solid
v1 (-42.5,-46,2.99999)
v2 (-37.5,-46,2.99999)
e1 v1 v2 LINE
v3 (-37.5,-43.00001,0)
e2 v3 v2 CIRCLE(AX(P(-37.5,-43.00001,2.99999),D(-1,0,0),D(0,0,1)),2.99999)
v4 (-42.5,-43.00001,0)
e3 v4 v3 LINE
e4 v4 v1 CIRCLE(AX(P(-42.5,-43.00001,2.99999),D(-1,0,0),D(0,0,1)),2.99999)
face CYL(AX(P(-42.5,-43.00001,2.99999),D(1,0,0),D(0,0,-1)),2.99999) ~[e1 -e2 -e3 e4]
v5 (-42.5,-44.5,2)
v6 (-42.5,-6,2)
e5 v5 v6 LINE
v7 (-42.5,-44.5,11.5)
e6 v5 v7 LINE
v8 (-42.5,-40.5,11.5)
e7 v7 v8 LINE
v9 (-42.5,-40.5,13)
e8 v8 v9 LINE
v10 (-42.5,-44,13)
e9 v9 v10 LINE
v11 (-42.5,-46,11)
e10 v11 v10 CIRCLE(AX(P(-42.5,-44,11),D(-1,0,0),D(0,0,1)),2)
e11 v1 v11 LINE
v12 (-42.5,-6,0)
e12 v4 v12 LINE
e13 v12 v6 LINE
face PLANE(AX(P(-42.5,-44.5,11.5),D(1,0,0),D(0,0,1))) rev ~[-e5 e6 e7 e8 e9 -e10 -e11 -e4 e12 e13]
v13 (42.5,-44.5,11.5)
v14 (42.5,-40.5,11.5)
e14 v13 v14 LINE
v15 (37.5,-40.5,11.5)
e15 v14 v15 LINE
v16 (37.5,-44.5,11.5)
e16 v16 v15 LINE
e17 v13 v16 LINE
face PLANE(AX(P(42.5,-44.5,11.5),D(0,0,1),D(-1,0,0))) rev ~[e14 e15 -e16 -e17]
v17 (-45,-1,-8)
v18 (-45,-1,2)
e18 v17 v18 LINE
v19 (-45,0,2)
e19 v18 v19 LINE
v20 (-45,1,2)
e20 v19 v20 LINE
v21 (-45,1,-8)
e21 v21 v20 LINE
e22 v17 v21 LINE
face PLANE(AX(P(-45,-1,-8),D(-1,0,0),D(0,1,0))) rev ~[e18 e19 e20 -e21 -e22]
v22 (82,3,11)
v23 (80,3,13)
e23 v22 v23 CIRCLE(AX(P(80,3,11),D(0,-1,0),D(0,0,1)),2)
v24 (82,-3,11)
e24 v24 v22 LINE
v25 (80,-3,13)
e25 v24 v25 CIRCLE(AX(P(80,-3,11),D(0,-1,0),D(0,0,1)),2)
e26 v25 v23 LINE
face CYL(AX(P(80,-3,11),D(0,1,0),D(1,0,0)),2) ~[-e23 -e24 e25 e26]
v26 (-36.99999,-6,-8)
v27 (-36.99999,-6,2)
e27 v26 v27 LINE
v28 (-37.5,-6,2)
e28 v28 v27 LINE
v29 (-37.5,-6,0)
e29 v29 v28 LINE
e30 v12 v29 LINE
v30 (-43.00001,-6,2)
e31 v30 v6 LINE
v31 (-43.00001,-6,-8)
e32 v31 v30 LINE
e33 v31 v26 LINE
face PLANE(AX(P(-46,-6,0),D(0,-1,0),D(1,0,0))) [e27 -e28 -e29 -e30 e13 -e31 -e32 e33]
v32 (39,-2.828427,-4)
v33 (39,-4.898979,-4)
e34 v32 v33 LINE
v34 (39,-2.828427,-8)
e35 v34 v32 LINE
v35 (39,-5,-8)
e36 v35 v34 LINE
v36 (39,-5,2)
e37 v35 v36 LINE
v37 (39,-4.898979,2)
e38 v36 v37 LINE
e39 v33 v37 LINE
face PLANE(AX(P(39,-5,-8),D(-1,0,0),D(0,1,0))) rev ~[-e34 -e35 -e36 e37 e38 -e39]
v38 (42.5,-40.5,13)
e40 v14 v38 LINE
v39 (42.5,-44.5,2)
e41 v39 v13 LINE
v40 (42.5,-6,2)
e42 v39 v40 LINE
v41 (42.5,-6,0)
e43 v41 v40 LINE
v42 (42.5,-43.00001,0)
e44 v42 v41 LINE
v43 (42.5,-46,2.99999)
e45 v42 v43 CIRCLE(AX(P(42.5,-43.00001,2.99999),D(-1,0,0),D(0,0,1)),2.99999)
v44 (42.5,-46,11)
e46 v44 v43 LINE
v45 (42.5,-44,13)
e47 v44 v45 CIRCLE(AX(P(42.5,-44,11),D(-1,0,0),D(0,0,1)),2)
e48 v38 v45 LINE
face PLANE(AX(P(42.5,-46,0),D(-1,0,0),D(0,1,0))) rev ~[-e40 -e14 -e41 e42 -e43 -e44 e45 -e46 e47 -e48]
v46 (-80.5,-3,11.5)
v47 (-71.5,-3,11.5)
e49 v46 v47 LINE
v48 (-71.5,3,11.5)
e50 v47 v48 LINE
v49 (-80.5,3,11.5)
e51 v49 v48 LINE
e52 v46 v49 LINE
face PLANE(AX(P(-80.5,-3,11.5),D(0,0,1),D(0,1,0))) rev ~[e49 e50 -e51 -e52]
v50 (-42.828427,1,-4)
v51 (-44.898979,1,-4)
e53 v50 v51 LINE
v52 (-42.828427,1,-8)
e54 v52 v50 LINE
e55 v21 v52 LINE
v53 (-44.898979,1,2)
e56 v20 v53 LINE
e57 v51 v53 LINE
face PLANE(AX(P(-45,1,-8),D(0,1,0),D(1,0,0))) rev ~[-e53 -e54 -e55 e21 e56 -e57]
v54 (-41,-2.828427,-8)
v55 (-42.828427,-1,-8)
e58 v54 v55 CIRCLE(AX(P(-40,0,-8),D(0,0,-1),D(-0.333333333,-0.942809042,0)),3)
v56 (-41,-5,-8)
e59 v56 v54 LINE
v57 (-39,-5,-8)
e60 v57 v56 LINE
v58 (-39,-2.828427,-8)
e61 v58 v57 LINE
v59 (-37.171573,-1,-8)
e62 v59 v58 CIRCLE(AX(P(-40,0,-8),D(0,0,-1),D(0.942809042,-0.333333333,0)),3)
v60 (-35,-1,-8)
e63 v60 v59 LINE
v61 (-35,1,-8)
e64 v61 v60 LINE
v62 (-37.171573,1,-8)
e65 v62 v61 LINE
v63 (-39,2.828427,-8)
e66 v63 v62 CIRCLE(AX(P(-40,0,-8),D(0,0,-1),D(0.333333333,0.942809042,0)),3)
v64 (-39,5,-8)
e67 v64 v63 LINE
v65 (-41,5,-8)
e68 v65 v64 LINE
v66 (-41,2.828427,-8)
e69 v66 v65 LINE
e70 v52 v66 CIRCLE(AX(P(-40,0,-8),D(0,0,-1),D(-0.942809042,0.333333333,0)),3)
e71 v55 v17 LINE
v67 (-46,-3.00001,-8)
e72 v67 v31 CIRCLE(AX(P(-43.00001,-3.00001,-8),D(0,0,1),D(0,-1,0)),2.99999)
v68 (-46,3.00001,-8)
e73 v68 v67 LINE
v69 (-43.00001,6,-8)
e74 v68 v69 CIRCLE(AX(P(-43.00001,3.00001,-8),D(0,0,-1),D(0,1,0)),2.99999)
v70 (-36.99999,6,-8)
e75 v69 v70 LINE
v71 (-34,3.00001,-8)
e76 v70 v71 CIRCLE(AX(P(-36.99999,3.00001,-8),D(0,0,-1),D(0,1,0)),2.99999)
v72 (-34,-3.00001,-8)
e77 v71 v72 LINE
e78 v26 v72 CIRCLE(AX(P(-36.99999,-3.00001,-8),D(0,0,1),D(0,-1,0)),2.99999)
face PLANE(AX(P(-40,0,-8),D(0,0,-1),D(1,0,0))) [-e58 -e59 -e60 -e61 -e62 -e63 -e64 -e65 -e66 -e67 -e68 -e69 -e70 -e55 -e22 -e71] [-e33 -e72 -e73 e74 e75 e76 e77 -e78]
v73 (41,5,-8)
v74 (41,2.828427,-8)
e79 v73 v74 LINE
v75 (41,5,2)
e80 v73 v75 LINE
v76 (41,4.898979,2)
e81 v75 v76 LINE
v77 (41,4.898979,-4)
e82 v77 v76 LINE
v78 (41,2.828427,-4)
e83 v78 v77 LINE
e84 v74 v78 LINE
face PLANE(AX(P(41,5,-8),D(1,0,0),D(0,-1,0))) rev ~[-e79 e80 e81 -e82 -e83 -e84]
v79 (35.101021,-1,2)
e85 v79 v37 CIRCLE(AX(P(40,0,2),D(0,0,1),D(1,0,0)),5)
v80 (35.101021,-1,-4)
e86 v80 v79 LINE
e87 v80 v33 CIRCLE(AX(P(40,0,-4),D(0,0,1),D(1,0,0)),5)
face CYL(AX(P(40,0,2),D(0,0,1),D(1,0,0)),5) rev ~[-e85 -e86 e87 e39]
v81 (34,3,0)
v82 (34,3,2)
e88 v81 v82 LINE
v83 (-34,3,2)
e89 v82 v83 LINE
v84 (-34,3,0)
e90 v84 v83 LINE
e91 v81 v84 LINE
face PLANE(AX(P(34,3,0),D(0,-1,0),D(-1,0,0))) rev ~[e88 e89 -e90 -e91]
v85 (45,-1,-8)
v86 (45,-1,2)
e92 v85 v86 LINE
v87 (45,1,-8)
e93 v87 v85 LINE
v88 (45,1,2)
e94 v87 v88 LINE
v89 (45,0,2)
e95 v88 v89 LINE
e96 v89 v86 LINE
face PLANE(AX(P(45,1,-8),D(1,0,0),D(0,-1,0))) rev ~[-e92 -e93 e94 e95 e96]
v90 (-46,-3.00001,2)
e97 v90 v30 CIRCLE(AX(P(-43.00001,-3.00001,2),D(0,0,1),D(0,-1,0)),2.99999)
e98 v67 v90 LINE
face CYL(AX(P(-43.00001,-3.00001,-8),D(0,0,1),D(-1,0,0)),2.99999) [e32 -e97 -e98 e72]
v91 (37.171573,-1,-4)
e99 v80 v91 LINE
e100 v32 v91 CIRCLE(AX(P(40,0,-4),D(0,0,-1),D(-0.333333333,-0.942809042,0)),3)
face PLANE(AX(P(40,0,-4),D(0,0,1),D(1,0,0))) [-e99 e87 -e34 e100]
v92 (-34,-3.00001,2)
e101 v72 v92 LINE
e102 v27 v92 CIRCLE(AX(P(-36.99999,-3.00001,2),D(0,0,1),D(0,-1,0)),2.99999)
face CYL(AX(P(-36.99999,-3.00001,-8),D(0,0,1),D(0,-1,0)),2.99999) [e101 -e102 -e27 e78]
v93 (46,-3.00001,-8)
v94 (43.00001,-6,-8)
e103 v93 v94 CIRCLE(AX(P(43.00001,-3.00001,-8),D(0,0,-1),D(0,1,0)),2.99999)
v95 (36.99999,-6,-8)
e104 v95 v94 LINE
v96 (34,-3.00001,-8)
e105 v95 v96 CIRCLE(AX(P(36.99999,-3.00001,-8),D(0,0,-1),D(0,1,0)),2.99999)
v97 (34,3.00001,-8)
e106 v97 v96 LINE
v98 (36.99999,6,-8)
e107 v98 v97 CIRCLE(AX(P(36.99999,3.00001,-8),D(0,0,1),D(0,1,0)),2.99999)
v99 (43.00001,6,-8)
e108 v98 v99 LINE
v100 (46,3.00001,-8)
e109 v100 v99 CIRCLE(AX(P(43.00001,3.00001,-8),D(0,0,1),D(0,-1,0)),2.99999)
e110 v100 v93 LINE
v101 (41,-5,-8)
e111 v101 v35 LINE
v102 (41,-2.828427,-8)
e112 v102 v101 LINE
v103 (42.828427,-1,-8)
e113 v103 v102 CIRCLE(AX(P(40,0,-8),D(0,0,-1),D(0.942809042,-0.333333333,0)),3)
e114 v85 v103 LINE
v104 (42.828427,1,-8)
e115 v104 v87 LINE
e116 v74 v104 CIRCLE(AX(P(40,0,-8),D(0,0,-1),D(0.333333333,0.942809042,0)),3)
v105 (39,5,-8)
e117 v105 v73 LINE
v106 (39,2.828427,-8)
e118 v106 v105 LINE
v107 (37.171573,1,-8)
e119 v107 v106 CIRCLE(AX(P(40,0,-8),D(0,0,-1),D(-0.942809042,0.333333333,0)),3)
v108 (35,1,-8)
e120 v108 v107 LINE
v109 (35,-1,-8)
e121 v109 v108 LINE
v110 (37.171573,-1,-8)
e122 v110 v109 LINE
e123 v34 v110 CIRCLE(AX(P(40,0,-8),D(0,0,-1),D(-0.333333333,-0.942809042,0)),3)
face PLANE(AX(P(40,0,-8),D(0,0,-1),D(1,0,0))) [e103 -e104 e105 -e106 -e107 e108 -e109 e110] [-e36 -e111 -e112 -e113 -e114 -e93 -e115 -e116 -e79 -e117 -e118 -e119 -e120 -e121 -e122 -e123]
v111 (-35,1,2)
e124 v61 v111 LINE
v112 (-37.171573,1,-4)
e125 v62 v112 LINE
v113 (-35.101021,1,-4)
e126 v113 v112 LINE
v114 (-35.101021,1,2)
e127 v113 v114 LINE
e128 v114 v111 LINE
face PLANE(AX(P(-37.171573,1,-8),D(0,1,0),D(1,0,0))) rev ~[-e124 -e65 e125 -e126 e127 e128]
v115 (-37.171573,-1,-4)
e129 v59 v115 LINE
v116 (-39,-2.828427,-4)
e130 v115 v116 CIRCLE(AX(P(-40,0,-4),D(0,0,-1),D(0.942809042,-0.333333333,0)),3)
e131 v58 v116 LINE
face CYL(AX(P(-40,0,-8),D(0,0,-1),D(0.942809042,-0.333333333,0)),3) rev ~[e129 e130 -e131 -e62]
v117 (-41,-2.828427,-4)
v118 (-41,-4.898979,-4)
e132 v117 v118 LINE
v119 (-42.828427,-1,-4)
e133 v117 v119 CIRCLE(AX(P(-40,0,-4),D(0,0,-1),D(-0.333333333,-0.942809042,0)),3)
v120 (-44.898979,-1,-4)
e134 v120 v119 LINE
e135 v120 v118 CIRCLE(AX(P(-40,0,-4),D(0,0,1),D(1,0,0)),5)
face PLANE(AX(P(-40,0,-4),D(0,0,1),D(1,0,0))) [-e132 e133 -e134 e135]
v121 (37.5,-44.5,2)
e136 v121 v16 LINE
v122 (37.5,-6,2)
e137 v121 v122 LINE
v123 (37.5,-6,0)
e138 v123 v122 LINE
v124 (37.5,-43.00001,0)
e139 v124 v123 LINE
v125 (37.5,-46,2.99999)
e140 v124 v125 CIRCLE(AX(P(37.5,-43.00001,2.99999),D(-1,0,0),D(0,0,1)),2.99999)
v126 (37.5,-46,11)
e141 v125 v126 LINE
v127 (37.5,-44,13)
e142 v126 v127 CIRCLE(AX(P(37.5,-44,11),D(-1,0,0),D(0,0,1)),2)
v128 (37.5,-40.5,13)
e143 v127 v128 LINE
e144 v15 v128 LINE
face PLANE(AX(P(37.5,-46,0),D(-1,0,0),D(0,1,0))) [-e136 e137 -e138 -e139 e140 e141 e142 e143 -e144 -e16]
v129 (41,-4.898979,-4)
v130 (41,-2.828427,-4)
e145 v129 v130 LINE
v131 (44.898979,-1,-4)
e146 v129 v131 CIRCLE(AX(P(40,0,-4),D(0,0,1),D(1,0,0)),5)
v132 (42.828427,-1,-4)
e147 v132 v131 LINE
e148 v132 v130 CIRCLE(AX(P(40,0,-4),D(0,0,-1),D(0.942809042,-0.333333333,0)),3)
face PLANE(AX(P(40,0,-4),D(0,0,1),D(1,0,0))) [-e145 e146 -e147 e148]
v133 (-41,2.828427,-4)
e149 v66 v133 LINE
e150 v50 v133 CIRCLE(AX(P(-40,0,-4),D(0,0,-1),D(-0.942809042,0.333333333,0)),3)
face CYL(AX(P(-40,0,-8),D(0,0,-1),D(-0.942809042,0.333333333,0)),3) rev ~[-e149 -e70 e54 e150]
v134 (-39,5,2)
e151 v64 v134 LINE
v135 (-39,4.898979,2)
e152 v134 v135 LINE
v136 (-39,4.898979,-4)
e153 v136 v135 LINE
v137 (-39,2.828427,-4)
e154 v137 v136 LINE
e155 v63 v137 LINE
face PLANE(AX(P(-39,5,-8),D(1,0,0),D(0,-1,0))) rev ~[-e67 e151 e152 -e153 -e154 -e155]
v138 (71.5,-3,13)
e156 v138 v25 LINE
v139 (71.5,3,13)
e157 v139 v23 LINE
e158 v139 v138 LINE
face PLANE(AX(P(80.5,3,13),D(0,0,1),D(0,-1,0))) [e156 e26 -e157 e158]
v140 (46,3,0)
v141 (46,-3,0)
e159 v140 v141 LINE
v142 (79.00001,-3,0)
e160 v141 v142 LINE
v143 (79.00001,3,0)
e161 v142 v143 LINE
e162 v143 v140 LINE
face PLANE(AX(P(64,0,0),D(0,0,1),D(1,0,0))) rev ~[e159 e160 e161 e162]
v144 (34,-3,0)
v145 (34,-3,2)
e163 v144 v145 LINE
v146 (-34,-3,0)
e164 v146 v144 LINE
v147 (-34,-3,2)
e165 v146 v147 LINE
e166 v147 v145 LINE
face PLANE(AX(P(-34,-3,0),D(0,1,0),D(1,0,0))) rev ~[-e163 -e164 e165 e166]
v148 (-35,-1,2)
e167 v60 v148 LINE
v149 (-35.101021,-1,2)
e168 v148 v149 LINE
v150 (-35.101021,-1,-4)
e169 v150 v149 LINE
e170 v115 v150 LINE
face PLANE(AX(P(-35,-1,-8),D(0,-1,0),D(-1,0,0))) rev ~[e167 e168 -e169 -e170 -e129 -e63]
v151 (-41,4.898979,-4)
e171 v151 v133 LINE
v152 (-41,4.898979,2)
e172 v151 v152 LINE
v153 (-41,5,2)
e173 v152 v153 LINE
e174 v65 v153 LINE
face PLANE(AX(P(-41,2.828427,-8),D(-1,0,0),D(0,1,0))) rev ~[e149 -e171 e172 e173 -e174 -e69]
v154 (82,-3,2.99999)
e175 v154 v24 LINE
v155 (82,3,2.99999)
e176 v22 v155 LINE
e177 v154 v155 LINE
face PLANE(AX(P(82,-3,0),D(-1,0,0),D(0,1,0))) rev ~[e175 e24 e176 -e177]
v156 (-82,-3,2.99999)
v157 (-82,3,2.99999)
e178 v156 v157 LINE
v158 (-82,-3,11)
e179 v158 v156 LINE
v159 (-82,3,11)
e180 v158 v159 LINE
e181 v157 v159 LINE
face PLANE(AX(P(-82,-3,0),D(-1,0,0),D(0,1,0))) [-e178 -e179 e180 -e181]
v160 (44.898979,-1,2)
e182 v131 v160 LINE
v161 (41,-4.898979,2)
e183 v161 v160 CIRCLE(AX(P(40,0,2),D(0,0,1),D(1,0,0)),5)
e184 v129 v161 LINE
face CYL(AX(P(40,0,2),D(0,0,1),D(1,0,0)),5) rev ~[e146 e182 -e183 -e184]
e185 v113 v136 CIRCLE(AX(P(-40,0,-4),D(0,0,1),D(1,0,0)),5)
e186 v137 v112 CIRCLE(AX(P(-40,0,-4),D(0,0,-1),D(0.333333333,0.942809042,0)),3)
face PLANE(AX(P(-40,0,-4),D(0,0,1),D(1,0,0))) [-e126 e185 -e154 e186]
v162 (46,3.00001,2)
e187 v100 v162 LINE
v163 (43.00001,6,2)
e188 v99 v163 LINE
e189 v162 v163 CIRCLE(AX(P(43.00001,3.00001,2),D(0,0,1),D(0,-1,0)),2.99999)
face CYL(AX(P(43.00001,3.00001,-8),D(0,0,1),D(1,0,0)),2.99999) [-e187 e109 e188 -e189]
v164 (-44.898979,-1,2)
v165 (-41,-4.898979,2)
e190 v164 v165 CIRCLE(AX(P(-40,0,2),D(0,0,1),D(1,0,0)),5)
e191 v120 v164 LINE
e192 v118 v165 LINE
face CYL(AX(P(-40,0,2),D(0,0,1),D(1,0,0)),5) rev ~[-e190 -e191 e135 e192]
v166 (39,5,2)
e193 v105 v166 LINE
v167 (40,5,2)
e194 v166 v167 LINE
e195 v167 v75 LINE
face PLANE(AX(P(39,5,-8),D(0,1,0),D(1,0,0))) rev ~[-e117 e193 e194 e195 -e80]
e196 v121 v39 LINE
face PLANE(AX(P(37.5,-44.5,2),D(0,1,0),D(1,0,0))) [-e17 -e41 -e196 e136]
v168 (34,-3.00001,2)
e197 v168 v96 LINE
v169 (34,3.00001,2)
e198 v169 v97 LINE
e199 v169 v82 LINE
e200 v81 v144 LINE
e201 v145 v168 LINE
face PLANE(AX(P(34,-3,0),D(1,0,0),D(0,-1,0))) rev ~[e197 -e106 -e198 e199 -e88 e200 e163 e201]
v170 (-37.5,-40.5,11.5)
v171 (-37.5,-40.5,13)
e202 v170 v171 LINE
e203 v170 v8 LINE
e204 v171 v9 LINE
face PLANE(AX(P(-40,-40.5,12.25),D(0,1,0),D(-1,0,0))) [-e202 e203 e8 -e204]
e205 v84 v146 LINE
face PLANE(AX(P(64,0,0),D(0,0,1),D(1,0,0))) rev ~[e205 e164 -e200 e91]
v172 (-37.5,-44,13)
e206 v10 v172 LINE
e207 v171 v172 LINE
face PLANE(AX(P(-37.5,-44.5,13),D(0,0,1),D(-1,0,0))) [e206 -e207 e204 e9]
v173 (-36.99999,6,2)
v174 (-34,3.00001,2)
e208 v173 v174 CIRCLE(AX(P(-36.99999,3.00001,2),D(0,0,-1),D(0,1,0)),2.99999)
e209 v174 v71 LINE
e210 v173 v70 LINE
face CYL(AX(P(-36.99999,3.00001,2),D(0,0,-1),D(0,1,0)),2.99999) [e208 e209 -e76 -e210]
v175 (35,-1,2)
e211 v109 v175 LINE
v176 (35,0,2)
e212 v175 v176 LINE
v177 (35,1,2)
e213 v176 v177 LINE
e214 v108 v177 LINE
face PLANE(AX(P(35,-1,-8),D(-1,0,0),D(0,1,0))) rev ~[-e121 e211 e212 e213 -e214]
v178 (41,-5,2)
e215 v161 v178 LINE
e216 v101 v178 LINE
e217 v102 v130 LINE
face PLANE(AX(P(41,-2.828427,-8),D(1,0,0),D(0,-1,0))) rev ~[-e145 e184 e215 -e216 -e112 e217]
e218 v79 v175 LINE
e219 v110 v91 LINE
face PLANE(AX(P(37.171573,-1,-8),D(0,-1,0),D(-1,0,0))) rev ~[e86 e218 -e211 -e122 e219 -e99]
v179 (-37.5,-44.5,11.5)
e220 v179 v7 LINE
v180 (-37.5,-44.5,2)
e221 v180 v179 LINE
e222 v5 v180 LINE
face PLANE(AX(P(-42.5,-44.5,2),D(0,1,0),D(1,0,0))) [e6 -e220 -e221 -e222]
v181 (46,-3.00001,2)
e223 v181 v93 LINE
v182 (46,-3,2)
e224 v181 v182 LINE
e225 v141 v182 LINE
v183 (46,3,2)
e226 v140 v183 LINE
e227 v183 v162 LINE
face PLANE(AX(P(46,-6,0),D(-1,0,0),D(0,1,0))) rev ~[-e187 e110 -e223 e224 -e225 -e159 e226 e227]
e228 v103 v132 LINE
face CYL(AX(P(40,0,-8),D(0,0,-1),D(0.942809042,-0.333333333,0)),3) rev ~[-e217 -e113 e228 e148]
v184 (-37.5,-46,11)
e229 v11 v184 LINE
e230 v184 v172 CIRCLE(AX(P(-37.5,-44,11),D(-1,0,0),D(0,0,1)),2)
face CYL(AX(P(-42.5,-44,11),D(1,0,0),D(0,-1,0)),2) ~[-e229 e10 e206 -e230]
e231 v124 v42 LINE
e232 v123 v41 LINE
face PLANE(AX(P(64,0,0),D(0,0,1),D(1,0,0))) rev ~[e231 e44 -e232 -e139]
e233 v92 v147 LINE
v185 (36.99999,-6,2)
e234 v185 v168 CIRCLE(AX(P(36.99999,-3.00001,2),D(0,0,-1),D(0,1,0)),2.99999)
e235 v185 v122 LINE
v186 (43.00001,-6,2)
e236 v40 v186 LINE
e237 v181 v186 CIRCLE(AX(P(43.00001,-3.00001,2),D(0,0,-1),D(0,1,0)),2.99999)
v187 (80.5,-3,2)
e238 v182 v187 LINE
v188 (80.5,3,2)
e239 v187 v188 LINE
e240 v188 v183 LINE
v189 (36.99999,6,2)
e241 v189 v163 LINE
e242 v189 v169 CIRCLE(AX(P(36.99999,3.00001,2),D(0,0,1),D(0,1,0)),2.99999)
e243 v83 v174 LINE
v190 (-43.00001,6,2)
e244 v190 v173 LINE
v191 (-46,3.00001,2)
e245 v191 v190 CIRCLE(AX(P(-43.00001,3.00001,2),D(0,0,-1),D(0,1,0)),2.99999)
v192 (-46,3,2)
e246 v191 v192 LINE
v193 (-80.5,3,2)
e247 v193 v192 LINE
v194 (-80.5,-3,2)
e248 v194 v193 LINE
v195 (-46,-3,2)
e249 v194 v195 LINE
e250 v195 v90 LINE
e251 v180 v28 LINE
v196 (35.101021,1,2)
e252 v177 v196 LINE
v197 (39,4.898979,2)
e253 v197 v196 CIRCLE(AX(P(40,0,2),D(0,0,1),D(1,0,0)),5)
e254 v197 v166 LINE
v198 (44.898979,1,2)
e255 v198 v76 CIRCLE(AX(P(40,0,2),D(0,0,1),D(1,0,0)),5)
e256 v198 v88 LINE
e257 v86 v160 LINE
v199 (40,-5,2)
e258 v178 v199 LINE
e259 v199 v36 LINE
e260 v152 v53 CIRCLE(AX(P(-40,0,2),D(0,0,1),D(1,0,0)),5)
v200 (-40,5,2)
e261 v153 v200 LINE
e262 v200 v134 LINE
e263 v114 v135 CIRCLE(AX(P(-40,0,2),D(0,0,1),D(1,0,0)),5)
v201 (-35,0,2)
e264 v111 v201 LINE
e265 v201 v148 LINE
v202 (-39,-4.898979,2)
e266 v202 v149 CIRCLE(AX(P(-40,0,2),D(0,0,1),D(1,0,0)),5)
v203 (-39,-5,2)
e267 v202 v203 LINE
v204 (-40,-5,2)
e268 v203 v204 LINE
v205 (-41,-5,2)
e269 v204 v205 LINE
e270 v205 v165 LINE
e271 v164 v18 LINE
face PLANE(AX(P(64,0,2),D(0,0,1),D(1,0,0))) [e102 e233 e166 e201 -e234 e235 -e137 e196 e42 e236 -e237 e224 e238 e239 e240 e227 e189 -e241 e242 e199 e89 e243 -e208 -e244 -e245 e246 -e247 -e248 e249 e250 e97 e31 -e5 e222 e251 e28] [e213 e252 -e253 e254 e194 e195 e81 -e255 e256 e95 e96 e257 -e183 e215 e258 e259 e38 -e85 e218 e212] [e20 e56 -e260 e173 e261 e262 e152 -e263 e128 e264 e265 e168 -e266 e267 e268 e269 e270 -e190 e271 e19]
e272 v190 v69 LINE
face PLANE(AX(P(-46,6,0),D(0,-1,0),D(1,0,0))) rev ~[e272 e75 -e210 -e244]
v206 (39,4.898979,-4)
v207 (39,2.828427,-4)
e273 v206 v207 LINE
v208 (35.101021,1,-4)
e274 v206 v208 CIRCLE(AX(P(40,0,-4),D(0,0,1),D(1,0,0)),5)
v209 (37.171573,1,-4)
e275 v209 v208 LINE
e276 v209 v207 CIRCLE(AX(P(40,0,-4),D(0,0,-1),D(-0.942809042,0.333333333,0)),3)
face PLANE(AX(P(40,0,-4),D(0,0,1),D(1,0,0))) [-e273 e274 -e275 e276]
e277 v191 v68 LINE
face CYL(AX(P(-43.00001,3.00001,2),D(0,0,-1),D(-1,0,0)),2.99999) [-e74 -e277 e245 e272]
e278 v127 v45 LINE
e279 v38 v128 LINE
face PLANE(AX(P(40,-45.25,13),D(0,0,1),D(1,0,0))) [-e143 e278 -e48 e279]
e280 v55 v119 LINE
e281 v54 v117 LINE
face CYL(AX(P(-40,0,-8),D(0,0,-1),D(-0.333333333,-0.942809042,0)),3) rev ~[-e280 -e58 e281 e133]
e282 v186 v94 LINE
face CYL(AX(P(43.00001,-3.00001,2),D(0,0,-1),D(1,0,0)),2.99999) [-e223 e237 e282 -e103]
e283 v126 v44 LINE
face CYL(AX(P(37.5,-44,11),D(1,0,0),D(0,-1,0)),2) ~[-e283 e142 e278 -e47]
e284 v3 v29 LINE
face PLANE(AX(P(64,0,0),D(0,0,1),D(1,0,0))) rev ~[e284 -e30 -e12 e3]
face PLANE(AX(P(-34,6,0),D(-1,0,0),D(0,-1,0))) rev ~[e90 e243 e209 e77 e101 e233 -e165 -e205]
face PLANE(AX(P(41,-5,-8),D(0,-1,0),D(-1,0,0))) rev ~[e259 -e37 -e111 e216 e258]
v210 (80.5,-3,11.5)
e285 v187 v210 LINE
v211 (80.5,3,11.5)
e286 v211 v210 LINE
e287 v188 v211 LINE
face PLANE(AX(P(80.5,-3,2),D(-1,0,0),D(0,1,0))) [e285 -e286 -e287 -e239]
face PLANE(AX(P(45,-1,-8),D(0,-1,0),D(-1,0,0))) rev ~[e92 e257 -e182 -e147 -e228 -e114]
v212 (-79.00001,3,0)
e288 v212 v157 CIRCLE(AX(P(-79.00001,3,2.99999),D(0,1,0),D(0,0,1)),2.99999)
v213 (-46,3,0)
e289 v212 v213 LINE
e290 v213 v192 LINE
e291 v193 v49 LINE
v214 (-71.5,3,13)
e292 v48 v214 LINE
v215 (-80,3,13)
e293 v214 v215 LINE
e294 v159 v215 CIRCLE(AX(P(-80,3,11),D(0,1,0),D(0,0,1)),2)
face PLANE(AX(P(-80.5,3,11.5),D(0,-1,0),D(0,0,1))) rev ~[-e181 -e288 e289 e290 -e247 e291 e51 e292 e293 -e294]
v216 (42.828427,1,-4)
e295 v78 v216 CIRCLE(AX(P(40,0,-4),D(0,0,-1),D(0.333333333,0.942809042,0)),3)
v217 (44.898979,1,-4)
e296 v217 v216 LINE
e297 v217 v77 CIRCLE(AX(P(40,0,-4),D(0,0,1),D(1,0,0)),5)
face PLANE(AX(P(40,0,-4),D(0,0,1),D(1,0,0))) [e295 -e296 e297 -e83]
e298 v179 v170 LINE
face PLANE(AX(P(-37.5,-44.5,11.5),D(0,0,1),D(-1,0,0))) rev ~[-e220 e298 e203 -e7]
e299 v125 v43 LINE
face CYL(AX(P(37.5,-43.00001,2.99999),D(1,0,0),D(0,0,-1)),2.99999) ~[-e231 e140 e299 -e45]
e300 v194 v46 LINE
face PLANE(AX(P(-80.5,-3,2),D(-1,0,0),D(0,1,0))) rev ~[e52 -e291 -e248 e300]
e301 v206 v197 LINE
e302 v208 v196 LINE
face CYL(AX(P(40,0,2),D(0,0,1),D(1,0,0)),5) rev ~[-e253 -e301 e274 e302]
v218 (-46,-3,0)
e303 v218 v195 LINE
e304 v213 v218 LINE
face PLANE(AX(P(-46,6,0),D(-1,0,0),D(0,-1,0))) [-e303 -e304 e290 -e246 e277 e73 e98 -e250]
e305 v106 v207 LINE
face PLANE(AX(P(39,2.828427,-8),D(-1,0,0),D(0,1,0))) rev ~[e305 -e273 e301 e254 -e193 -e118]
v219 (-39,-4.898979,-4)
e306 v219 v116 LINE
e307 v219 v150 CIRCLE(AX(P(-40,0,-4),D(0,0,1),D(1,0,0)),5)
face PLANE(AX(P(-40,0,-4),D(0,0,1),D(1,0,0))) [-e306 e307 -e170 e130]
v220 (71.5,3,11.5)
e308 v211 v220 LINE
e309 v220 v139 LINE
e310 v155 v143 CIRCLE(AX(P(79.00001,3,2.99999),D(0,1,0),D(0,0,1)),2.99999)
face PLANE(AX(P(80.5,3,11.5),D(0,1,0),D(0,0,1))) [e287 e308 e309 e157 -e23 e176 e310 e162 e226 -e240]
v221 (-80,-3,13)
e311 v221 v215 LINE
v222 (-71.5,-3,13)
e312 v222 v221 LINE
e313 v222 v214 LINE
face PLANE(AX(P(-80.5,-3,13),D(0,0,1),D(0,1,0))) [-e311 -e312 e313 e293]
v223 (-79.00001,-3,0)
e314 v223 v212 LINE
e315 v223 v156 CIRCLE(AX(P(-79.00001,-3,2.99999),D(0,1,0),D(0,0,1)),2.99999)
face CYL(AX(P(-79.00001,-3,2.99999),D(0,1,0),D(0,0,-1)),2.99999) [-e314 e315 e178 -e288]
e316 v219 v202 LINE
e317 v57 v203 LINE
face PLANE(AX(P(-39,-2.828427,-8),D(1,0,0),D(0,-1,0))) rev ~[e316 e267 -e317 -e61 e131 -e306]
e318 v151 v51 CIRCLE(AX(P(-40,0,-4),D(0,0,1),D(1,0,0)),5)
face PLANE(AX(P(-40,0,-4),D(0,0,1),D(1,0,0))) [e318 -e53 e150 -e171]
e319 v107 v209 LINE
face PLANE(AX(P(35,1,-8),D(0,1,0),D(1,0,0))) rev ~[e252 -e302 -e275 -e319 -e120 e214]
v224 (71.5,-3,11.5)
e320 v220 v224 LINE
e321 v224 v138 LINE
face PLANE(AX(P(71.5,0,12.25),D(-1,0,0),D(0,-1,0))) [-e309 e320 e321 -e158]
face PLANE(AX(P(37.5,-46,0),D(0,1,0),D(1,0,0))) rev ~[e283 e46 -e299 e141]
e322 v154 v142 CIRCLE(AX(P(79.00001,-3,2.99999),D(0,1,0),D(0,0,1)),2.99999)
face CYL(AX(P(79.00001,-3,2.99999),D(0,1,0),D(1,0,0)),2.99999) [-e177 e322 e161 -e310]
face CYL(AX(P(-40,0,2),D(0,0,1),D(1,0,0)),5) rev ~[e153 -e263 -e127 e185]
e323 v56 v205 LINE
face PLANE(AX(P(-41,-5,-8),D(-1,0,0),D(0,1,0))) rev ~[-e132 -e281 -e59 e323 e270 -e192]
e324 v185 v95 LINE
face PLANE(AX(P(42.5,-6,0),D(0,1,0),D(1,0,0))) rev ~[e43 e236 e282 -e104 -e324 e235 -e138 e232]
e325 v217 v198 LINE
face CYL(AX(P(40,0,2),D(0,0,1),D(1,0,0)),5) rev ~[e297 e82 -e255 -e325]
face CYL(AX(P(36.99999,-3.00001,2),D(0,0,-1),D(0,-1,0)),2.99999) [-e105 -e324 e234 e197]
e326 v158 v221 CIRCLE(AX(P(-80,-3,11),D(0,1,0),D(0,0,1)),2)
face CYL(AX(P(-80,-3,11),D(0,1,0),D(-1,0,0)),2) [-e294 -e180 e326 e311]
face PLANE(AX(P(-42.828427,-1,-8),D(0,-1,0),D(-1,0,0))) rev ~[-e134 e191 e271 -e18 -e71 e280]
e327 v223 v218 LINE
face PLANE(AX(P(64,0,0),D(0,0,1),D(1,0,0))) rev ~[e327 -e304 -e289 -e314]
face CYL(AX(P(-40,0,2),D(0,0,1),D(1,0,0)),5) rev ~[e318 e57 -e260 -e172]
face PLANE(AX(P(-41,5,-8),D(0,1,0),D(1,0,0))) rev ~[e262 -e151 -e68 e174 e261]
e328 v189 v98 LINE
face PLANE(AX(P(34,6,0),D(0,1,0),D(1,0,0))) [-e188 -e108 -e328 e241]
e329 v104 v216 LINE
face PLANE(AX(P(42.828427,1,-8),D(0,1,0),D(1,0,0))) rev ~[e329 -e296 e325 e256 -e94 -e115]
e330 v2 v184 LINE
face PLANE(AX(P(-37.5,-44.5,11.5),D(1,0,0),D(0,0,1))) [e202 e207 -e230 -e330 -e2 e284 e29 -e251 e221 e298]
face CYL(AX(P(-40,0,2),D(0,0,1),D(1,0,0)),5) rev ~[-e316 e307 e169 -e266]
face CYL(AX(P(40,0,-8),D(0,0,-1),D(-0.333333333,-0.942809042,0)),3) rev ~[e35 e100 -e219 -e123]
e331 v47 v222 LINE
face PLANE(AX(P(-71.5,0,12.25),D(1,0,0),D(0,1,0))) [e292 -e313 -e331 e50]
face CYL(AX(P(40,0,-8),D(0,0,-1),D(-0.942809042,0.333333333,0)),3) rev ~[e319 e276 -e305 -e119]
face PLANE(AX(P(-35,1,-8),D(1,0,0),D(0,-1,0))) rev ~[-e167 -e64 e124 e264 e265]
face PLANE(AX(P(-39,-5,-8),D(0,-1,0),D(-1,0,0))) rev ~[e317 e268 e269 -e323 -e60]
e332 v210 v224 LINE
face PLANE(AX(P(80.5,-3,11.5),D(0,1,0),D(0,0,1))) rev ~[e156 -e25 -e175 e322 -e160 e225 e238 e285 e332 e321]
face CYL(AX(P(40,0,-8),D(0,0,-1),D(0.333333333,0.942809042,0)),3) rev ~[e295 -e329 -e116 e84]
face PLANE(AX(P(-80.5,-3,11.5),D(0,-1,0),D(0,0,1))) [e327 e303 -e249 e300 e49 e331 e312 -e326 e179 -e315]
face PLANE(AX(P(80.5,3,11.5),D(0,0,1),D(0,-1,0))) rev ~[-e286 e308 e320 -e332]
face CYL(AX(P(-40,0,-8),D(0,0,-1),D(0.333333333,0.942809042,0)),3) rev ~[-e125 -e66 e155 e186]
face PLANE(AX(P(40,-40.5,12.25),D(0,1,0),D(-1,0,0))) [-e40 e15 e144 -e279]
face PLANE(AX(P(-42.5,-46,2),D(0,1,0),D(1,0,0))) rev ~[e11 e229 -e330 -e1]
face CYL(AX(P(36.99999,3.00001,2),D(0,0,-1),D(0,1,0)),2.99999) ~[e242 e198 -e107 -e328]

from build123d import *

# Parameters (mm, degrees)
F0_W      = 36
F0_H      = 6
F0_W_2    = 12
F0_H_2    = 3
F0_W_3    = 34
F0_W_4    = 2.5
F0_H_3    = 40
F1_DEPTH  = 2
F2_W      = 5
F2_H      = 1.5
F2_W_2    = 1.5
F2_H_2    = 6
F3_DEPTH  = 11
F4_W      = 5
F4_H      = 1.5
F5_DEPTH  = 4
F6_W      = 6
F6_H      = 1.5
F7_DEPTH  = 9
F8_W      = 6
F8_H      = 1.5
F9_DEPTH  = 9
F10_W     = 12
F10_H     = 12
F11_DEPTH = 8
F12_R     = 5
F13_DEPTH = 6
F15_DEPTH = 10
F16_R     = 2.99999
F17_R     = 2


# Not quite as in the source:
# - a fillet or chamfer is up to 0.001 mm smaller than in the source, because OpenCascade refuses the exact size


with BuildPart() as f1:
    # F0 (on Top) → F1 (new body)
    with BuildSketch(Plane.XY):
        with Locations((64, 0)):
            Rectangle(F0_W, F0_H)
        Polygon((46, -3), (46, 3), (34, 3), (34, 0), (34, -3), align=None)
        with Locations((40, 4.5)):
            Rectangle(F0_W_2, F0_H_2)
        Polygon((34, 0), (34, 3), (-34, 3), (-34, 0), (0, 0), align=None)
        Polygon((46, -6), (46, -3), (34, -3), (34, -6), (37.5, -6), (40, -6), (42.5, -6), align=None)
        Polygon((-34, 0), (-34, 3), (-46, 3), (-46, -3), (-34, -3), align=None)
        with Locations((-40, 4.5)):
            Rectangle(F0_W_2, F0_H_2)
        with Locations((17, -1.5)):
            Rectangle(F0_W_3, F0_H_2)
        with Locations((-64, 0)):
            Rectangle(F0_W, F0_H)
        with Locations((-17, -1.5)):
            Rectangle(F0_W_3, F0_H_2)
        with Locations((41.25, -26)):
            Rectangle(F0_W_4, F0_H_3)
        Polygon((-34, -3), (-46, -3), (-46, -6), (-42.5, -6), (-40, -6), (-37.5, -6), (-34, -6), align=None)
        with Locations((38.75, -26)):
            Rectangle(F0_W_4, F0_H_3)
        with Locations((-41.25, -26)):
            Rectangle(F0_W_4, F0_H_3)
        with Locations((-38.75, -26)):
            Rectangle(F0_W_4, F0_H_3)
    extrude(amount=F1_DEPTH)

    # F2 (on face) → F3 (join)
    with BuildSketch(Plane.XY.offset(2)):
        with Locations((-40, -45.25)):
            Rectangle(F2_W, F2_H)
        with Locations((40, -45.25)):
            Rectangle(F2_W, F2_H)
        with Locations((-81.25, 0)):
            Rectangle(F2_W_2, F2_H_2)
        with Locations((81.25, 0)):
            Rectangle(F2_W_2, F2_H_2)
    extrude(amount=F3_DEPTH)

    # F4 (on face) → F5 (join)
    with BuildSketch(Plane(origin=(0, -44.5, 0), x_dir=(-1, 0, 0), z_dir=(0, 1, 0))):
        with Locations((40, 12.25)):
            Rectangle(F4_W, F4_H)
        with Locations((-40, 12.25)):
            Rectangle(F4_W, F4_H)
    extrude(amount=F5_DEPTH)

    # F6 (on face) → F7 (join)
    with BuildSketch(Plane(origin=(80.5, 0, 0), x_dir=(0, -1, 0), z_dir=(-1, 0, 0))):
        with Locations((0, 12.25)):
            Rectangle(F6_W, F6_H)
    extrude(amount=F7_DEPTH)

    # F8 (on face) → F9 (join)
    with BuildSketch(Plane.YZ.offset(-80.5)):
        with Locations((0, 12.25)):
            Rectangle(F8_W, F8_H)
    extrude(amount=F9_DEPTH)

    # F10 (on face) → F11 (join)
    with BuildSketch(Plane(origin=(0, 0, 0), x_dir=(1, 0, 0), z_dir=(0, 0, -1))):
        with Locations((-40, 0)):
            Rectangle(F10_W, F10_H)
        with Locations((40, 0)):
            Rectangle(F10_W, F10_H)
    extrude(amount=F11_DEPTH)

    # F12 (on face) → F13 (cut)
    with BuildSketch(Plane.XY.offset(2)):
        with Locations((-40, 0)):
            Circle(F12_R)
        with Locations((40, 0)):
            Circle(F12_R)
    extrude(amount=-F13_DEPTH, mode=Mode.SUBTRACT)

    # F14 (on face) → F15 (cut)
    with BuildSketch(Plane(origin=(0, 0, -8), x_dir=(1, 0, 0), z_dir=(0, 0, -1))):
        with BuildLine():
            ThreePointArc((42.8284271247, -1), (42.956795679, -0.5073059362), (43, 0))
            ThreePointArc((43, 0), (42.956795679, 0.5073059362), (42.8284271247, 1))
            ThreePointArc((42.8284271247, 1), (42.1213203436, 2.1213203436), (41, 2.8284271247))
            ThreePointArc((41, 2.8284271247), (40, 3), (39, 2.8284271247))
            ThreePointArc((39, 2.8284271247), (37.8786796564, 2.1213203436), (37.1715728753, 1))
            ThreePointArc((37.1715728753, 1), (37, 0), (37.1715728753, -1))
            ThreePointArc((37.1715728753, -1), (37.8786796564, -2.1213203436), (39, -2.8284271247))
            ThreePointArc((39, -2.8284271247), (40, -3), (41, -2.8284271247))
            ThreePointArc((41, -2.8284271247), (42.1213203436, -2.1213203436), (42.8284271247, -1))
        make_face()
        with BuildLine():
            ThreePointArc((42.8284271247, 1), (42.956795679, 0.5073059362), (43, 0))
            ThreePointArc((43, 0), (42.956795679, -0.5073059362), (42.8284271247, -1))
            Line((42.8284271247, -1), (45, -1))
            Line((45, -1), (45, 0))
            Line((45, 0), (45, 1))
            Line((45, 1), (42.8284271247, 1))
        make_face()
        with BuildLine():
            ThreePointArc((39, 2.8284271247), (40, 3), (41, 2.8284271247))
            Line((41, 2.8284271247), (41, 5))
            Line((41, 5), (40, 5))
            Line((40, 5), (39, 5))
            Line((39, 5), (39, 2.8284271247))
        make_face()
        with BuildLine():
            Line((41, -5), (41, -2.8284271247))
            ThreePointArc((41, -2.8284271247), (40, -3), (39, -2.8284271247))
            Line((39, -2.8284271247), (39, -5))
            Line((39, -5), (40, -5))
            Line((40, -5), (41, -5))
        make_face()
        with BuildLine():
            ThreePointArc((37.1715728753, -1), (37, 0), (37.1715728753, 1))
            Line((37.1715728753, 1), (35, 1))
            Line((35, 1), (35, 0))
            Line((35, 0), (35, -1))
            Line((35, -1), (37.1715728753, -1))
        make_face()
        with BuildLine():
            ThreePointArc((-37.1715728753, -1), (-37.043204321, -0.5073059362), (-37, 0))
            ThreePointArc((-37, 0), (-37.043204321, 0.5073059362), (-37.1715728753, 1))
            ThreePointArc((-37.1715728753, 1), (-37.8786796564, 2.1213203436), (-39, 2.8284271247))
            ThreePointArc((-39, 2.8284271247), (-40, 3), (-41, 2.8284271247))
            ThreePointArc((-41, 2.8284271247), (-42.1213203436, 2.1213203436), (-42.8284271247, 1))
            ThreePointArc((-42.8284271247, 1), (-43, 0), (-42.8284271247, -1))
            ThreePointArc((-42.8284271247, -1), (-42.1213203436, -2.1213203436), (-41, -2.8284271247))
            ThreePointArc((-41, -2.8284271247), (-40, -3), (-39, -2.8284271247))
            ThreePointArc((-39, -2.8284271247), (-37.8786796564, -2.1213203436), (-37.1715728753, -1))
        make_face()
        with BuildLine():
            ThreePointArc((-37.1715728753, 1), (-37.043204321, 0.5073059362), (-37, 0))
            ThreePointArc((-37, 0), (-37.043204321, -0.5073059362), (-37.1715728753, -1))
            Line((-37.1715728753, -1), (-35, -1))
            Line((-35, -1), (-35, 0))
            Line((-35, 0), (-35, 1))
            Line((-35, 1), (-37.1715728753, 1))
        make_face()
        with BuildLine():
            ThreePointArc((-41, 2.8284271247), (-40, 3), (-39, 2.8284271247))
            Line((-39, 2.8284271247), (-39, 5))
            Line((-39, 5), (-40, 5))
            Line((-40, 5), (-41, 5))
            Line((-41, 5), (-41, 2.8284271247))
        make_face()
        with BuildLine():
            Line((-39, -5), (-39, -2.8284271247))
            ThreePointArc((-39, -2.8284271247), (-40, -3), (-41, -2.8284271247))
            Line((-41, -2.8284271247), (-41, -5))
            Line((-41, -5), (-40, -5))
            Line((-40, -5), (-39, -5))
        make_face()
        with BuildLine():
            ThreePointArc((-42.8284271247, -1), (-43, 0), (-42.8284271247, 1))
            Line((-42.8284271247, 1), (-45, 1))
            Line((-45, 1), (-45, 0))
            Line((-45, 0), (-45, -1))
            Line((-45, -1), (-42.8284271247, -1))
        make_face()
    extrude(amount=-F15_DEPTH, mode=Mode.SUBTRACT)

    # F16 (radius 3 in the source; OpenCascade refuses exactly that, so slightly less here)
    f16_edges = [f1.edges().sort_by_distance(p)[0] for p in [
        (-46, 6, -3),
        (-34, 6, -3),
        (-34, -6, -3),
        (-46, -6, -3),
        (46, 6, -3),
        (34, 6, -3),
        (46, -6, -3),
        (34, -6, -3),
        (40, -46, 0),
        (-40, -46, 0),
        (-82, 0, 0),
        (82, 0, 0),
    ]]
    fillet(f16_edges, radius=F16_R)

    # F17
    f17_edges = [f1.edges().sort_by_distance(p)[0] for p in [
        (-82, 0, 13),
        (-40, -46, 13),
        (40, -46, 13),
        (82, 0, 13),
    ]]
    fillet(f17_edges, radius=F17_R)


solid = f1.part
